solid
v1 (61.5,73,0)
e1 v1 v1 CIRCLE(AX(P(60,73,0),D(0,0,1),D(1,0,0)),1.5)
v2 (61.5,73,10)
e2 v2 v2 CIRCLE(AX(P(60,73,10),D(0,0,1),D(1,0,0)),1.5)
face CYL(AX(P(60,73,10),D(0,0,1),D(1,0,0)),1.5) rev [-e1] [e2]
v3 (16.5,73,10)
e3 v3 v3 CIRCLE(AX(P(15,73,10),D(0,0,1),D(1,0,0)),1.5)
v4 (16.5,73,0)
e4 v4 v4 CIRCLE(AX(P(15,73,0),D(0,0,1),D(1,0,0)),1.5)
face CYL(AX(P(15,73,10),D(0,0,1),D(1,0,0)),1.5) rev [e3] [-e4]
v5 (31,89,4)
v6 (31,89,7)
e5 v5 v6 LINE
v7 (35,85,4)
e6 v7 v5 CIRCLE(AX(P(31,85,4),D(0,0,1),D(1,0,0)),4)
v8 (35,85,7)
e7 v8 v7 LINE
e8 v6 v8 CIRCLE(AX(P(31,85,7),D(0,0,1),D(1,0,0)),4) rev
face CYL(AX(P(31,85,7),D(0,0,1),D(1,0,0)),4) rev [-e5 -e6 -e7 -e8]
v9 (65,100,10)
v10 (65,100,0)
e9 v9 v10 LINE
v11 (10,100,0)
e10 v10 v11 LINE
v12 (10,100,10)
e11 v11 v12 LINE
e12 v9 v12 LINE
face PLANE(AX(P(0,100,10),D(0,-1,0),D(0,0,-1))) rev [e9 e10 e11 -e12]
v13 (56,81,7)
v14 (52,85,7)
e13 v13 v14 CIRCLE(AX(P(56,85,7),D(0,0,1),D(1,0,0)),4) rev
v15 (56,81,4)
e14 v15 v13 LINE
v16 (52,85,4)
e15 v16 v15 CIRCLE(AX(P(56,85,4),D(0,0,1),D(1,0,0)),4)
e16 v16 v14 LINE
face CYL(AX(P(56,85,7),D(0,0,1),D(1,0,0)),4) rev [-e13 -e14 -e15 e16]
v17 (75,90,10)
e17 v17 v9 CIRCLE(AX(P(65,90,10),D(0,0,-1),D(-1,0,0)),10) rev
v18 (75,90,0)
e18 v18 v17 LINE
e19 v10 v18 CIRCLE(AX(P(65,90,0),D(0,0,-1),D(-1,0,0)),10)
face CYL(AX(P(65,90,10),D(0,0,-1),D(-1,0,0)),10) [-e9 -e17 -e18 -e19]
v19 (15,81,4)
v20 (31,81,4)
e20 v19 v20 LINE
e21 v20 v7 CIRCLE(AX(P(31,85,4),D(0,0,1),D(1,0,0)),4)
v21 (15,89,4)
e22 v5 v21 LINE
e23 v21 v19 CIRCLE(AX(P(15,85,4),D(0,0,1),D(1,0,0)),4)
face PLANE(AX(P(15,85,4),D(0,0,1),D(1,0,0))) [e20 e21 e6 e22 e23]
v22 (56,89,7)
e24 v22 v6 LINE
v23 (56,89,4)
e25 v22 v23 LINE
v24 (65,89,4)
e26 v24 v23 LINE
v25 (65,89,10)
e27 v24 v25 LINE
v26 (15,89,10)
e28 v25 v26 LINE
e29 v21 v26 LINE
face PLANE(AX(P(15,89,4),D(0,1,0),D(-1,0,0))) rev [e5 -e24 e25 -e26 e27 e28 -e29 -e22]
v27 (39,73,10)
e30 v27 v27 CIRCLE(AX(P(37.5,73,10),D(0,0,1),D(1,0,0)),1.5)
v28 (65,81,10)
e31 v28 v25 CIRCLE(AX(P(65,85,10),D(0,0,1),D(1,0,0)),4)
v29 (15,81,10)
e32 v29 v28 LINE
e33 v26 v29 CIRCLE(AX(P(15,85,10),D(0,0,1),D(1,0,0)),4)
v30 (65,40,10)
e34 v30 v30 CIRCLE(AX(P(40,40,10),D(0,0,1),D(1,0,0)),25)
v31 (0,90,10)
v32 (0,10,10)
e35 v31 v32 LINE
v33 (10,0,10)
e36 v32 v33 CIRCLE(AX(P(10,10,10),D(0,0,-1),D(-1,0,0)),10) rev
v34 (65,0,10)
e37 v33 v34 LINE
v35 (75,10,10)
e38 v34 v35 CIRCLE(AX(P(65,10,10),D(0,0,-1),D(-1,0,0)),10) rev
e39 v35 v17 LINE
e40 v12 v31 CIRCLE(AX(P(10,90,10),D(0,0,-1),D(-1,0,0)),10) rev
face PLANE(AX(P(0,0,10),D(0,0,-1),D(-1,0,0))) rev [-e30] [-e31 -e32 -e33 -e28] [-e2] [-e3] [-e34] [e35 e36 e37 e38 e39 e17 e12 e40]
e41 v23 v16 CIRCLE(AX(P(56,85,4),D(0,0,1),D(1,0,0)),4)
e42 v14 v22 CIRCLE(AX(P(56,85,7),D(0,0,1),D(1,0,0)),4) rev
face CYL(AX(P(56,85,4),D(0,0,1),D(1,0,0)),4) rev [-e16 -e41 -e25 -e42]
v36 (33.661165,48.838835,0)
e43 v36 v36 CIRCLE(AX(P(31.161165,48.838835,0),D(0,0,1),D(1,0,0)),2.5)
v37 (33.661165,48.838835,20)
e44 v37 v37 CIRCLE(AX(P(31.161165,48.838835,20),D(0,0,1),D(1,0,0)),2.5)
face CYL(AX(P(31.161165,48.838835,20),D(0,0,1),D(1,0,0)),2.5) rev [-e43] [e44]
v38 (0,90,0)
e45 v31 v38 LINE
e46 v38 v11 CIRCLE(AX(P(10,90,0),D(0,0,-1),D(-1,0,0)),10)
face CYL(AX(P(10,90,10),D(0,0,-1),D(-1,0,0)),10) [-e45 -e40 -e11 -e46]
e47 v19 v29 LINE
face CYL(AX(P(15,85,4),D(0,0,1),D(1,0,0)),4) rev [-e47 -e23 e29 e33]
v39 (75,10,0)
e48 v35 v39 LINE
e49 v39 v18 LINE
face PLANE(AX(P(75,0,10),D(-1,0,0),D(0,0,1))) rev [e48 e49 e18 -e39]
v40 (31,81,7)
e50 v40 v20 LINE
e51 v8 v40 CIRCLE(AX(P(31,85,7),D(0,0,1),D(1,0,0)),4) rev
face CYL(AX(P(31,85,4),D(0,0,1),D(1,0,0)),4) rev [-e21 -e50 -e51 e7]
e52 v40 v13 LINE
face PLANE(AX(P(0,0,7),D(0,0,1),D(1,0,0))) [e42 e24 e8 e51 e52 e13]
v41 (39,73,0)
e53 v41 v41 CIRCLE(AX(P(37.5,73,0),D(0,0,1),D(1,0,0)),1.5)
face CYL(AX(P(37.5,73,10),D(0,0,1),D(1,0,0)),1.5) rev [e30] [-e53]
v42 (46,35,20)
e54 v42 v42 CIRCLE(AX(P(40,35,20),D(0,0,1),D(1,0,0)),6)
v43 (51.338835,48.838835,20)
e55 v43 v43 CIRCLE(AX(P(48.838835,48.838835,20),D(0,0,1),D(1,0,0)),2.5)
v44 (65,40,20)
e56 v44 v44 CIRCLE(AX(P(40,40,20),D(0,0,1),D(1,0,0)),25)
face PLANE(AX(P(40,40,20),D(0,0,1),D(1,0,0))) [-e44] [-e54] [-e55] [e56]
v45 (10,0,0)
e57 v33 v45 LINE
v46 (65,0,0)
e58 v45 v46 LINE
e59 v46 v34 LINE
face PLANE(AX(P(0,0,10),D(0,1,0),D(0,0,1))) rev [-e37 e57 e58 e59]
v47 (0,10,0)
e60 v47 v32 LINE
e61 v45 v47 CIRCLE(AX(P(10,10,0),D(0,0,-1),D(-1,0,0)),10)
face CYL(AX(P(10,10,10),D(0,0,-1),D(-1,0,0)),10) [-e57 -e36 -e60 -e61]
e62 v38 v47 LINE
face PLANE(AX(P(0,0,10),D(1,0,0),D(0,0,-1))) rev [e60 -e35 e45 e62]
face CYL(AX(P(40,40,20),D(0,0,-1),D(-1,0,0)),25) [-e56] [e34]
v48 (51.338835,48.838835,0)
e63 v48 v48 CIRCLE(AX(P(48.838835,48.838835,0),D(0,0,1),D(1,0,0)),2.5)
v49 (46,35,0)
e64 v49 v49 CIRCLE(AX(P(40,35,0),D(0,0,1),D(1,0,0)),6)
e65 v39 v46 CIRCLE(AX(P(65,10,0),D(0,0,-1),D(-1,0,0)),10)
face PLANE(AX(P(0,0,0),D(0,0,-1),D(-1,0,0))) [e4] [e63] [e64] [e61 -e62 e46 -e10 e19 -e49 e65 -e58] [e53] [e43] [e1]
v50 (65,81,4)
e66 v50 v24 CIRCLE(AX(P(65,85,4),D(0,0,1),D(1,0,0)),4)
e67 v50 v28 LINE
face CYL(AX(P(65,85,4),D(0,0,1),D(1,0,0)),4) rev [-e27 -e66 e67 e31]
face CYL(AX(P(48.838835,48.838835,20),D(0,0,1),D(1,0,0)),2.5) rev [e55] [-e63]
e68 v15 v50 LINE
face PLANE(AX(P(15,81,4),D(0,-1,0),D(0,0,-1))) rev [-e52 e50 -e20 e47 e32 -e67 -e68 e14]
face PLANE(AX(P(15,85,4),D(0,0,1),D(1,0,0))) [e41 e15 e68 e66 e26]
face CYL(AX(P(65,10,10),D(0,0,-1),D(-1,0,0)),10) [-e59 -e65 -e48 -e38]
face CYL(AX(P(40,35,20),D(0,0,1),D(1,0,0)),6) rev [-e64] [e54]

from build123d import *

# Parameters (mm, degrees)
SKETCH2_W                    = 75
SKETCH2_H                    = 100
BOSS_EXTRUDE1_DEPTH          = 10
SKETCH5_R                    = 25
BOSS_EXTRUDE4_DEPTH          = 10
F_5_0_5_DIAMETER_HOLE1_D     = 5
F_12_0_12_DIAMETER_HOLE1_D   = 12
CUT_EXTRUDE1_DEPTH           = 6
FILLET1_R                    = 10
F_3_0_3_DIAMETER_HOLE1_D     = 3
F_3_0_3_DIAMETER_HOLE1_DEPTH = 10
F_3_0_3_DIAMETER_HOLE1_TIP   = 0.901290929
SKETCH18_W                   = 17
SKETCH18_H                   = 8
BOSS_EXTRUDE5_DEPTH          = 3
FILLET2_R                    = 4


with BuildPart() as part:
    # Sketch2 → Boss-Extrude1 (new body)
    with BuildSketch(Plane.XY):
        with Locations((37.5, 50)):
            Rectangle(SKETCH2_W, SKETCH2_H)
    extrude(amount=BOSS_EXTRUDE1_DEPTH)

    # Sketch5 → Boss-Extrude4 (add)
    with BuildSketch(Plane.XY.offset(10)):
        with Locations((40, 40)):
            Circle(SKETCH5_R)
    extrude(amount=BOSS_EXTRUDE4_DEPTH)

    # Ø5.0 (5) Diameter Hole1 (through all)
    with Locations(Plane.XY.offset(20)):
        with Locations((31.161165235, 48.838834765), (48.838834765, 48.838834765)):
            Hole(F_5_0_5_DIAMETER_HOLE1_D / 2)

    # Ø12.0 (12) Diameter Hole1 (through all)
    with Locations(Plane.XY.offset(20)):
        with Locations((40, 35)):
            Hole(F_12_0_12_DIAMETER_HOLE1_D / 2)

    # Sketch12 → Cut-Extrude1 (cut)
    with BuildSketch(Plane.XY.offset(10)):
        with BuildLine():
            Line((15, 89), (65, 89))
            ThreePointArc((65, 89), (69, 85), (65, 81))
            Line((65, 81), (15, 81))
            ThreePointArc((15, 81), (11, 85), (15, 89))
        make_face()
    extrude(amount=-CUT_EXTRUDE1_DEPTH, mode=Mode.SUBTRACT)

    # Fillet1
    fillet1_edges = [part.edges().sort_by_distance(p)[0] for p in [
        (0, 100, 5),
        (75, 100, 5),
        (75, 0, 5),
        (0, 0, 5),
    ]]
    fillet(fillet1_edges, radius=FILLET1_R)

    # Ø3.0 (3) Diameter Hole1
    with Locations(Plane.XY.offset(10)):
        with Locations((15, 73), (37.5, 73), (60, 73)):
            Hole(F_3_0_3_DIAMETER_HOLE1_D / 2, depth=F_3_0_3_DIAMETER_HOLE1_DEPTH)
            with Locations((0, 0, -(F_3_0_3_DIAMETER_HOLE1_DEPTH + F_3_0_3_DIAMETER_HOLE1_TIP / 2))):  # 118° drill point
                Cone(0, F_3_0_3_DIAMETER_HOLE1_D / 2, F_3_0_3_DIAMETER_HOLE1_TIP, mode=Mode.SUBTRACT)

    # Sketch18 → Boss-Extrude5 (add)
    with BuildSketch(Plane.XY.offset(4)):
        with Locations((43.5, 85)):
            Rectangle(SKETCH18_W, SKETCH18_H)
    extrude(amount=BOSS_EXTRUDE5_DEPTH)

    # Fillet2
    fillet2_edges = [part.edges().sort_by_distance(p)[0] for p in [
        (52, 81, 5.5),
        (52, 89, 5.5),
        (35, 81, 5.5),
        (35, 89, 5.5),
    ]]
    fillet(fillet2_edges, radius=FILLET2_R - 0.0001)  # a hair under: the kernel refuses the full size


solid = part.part
